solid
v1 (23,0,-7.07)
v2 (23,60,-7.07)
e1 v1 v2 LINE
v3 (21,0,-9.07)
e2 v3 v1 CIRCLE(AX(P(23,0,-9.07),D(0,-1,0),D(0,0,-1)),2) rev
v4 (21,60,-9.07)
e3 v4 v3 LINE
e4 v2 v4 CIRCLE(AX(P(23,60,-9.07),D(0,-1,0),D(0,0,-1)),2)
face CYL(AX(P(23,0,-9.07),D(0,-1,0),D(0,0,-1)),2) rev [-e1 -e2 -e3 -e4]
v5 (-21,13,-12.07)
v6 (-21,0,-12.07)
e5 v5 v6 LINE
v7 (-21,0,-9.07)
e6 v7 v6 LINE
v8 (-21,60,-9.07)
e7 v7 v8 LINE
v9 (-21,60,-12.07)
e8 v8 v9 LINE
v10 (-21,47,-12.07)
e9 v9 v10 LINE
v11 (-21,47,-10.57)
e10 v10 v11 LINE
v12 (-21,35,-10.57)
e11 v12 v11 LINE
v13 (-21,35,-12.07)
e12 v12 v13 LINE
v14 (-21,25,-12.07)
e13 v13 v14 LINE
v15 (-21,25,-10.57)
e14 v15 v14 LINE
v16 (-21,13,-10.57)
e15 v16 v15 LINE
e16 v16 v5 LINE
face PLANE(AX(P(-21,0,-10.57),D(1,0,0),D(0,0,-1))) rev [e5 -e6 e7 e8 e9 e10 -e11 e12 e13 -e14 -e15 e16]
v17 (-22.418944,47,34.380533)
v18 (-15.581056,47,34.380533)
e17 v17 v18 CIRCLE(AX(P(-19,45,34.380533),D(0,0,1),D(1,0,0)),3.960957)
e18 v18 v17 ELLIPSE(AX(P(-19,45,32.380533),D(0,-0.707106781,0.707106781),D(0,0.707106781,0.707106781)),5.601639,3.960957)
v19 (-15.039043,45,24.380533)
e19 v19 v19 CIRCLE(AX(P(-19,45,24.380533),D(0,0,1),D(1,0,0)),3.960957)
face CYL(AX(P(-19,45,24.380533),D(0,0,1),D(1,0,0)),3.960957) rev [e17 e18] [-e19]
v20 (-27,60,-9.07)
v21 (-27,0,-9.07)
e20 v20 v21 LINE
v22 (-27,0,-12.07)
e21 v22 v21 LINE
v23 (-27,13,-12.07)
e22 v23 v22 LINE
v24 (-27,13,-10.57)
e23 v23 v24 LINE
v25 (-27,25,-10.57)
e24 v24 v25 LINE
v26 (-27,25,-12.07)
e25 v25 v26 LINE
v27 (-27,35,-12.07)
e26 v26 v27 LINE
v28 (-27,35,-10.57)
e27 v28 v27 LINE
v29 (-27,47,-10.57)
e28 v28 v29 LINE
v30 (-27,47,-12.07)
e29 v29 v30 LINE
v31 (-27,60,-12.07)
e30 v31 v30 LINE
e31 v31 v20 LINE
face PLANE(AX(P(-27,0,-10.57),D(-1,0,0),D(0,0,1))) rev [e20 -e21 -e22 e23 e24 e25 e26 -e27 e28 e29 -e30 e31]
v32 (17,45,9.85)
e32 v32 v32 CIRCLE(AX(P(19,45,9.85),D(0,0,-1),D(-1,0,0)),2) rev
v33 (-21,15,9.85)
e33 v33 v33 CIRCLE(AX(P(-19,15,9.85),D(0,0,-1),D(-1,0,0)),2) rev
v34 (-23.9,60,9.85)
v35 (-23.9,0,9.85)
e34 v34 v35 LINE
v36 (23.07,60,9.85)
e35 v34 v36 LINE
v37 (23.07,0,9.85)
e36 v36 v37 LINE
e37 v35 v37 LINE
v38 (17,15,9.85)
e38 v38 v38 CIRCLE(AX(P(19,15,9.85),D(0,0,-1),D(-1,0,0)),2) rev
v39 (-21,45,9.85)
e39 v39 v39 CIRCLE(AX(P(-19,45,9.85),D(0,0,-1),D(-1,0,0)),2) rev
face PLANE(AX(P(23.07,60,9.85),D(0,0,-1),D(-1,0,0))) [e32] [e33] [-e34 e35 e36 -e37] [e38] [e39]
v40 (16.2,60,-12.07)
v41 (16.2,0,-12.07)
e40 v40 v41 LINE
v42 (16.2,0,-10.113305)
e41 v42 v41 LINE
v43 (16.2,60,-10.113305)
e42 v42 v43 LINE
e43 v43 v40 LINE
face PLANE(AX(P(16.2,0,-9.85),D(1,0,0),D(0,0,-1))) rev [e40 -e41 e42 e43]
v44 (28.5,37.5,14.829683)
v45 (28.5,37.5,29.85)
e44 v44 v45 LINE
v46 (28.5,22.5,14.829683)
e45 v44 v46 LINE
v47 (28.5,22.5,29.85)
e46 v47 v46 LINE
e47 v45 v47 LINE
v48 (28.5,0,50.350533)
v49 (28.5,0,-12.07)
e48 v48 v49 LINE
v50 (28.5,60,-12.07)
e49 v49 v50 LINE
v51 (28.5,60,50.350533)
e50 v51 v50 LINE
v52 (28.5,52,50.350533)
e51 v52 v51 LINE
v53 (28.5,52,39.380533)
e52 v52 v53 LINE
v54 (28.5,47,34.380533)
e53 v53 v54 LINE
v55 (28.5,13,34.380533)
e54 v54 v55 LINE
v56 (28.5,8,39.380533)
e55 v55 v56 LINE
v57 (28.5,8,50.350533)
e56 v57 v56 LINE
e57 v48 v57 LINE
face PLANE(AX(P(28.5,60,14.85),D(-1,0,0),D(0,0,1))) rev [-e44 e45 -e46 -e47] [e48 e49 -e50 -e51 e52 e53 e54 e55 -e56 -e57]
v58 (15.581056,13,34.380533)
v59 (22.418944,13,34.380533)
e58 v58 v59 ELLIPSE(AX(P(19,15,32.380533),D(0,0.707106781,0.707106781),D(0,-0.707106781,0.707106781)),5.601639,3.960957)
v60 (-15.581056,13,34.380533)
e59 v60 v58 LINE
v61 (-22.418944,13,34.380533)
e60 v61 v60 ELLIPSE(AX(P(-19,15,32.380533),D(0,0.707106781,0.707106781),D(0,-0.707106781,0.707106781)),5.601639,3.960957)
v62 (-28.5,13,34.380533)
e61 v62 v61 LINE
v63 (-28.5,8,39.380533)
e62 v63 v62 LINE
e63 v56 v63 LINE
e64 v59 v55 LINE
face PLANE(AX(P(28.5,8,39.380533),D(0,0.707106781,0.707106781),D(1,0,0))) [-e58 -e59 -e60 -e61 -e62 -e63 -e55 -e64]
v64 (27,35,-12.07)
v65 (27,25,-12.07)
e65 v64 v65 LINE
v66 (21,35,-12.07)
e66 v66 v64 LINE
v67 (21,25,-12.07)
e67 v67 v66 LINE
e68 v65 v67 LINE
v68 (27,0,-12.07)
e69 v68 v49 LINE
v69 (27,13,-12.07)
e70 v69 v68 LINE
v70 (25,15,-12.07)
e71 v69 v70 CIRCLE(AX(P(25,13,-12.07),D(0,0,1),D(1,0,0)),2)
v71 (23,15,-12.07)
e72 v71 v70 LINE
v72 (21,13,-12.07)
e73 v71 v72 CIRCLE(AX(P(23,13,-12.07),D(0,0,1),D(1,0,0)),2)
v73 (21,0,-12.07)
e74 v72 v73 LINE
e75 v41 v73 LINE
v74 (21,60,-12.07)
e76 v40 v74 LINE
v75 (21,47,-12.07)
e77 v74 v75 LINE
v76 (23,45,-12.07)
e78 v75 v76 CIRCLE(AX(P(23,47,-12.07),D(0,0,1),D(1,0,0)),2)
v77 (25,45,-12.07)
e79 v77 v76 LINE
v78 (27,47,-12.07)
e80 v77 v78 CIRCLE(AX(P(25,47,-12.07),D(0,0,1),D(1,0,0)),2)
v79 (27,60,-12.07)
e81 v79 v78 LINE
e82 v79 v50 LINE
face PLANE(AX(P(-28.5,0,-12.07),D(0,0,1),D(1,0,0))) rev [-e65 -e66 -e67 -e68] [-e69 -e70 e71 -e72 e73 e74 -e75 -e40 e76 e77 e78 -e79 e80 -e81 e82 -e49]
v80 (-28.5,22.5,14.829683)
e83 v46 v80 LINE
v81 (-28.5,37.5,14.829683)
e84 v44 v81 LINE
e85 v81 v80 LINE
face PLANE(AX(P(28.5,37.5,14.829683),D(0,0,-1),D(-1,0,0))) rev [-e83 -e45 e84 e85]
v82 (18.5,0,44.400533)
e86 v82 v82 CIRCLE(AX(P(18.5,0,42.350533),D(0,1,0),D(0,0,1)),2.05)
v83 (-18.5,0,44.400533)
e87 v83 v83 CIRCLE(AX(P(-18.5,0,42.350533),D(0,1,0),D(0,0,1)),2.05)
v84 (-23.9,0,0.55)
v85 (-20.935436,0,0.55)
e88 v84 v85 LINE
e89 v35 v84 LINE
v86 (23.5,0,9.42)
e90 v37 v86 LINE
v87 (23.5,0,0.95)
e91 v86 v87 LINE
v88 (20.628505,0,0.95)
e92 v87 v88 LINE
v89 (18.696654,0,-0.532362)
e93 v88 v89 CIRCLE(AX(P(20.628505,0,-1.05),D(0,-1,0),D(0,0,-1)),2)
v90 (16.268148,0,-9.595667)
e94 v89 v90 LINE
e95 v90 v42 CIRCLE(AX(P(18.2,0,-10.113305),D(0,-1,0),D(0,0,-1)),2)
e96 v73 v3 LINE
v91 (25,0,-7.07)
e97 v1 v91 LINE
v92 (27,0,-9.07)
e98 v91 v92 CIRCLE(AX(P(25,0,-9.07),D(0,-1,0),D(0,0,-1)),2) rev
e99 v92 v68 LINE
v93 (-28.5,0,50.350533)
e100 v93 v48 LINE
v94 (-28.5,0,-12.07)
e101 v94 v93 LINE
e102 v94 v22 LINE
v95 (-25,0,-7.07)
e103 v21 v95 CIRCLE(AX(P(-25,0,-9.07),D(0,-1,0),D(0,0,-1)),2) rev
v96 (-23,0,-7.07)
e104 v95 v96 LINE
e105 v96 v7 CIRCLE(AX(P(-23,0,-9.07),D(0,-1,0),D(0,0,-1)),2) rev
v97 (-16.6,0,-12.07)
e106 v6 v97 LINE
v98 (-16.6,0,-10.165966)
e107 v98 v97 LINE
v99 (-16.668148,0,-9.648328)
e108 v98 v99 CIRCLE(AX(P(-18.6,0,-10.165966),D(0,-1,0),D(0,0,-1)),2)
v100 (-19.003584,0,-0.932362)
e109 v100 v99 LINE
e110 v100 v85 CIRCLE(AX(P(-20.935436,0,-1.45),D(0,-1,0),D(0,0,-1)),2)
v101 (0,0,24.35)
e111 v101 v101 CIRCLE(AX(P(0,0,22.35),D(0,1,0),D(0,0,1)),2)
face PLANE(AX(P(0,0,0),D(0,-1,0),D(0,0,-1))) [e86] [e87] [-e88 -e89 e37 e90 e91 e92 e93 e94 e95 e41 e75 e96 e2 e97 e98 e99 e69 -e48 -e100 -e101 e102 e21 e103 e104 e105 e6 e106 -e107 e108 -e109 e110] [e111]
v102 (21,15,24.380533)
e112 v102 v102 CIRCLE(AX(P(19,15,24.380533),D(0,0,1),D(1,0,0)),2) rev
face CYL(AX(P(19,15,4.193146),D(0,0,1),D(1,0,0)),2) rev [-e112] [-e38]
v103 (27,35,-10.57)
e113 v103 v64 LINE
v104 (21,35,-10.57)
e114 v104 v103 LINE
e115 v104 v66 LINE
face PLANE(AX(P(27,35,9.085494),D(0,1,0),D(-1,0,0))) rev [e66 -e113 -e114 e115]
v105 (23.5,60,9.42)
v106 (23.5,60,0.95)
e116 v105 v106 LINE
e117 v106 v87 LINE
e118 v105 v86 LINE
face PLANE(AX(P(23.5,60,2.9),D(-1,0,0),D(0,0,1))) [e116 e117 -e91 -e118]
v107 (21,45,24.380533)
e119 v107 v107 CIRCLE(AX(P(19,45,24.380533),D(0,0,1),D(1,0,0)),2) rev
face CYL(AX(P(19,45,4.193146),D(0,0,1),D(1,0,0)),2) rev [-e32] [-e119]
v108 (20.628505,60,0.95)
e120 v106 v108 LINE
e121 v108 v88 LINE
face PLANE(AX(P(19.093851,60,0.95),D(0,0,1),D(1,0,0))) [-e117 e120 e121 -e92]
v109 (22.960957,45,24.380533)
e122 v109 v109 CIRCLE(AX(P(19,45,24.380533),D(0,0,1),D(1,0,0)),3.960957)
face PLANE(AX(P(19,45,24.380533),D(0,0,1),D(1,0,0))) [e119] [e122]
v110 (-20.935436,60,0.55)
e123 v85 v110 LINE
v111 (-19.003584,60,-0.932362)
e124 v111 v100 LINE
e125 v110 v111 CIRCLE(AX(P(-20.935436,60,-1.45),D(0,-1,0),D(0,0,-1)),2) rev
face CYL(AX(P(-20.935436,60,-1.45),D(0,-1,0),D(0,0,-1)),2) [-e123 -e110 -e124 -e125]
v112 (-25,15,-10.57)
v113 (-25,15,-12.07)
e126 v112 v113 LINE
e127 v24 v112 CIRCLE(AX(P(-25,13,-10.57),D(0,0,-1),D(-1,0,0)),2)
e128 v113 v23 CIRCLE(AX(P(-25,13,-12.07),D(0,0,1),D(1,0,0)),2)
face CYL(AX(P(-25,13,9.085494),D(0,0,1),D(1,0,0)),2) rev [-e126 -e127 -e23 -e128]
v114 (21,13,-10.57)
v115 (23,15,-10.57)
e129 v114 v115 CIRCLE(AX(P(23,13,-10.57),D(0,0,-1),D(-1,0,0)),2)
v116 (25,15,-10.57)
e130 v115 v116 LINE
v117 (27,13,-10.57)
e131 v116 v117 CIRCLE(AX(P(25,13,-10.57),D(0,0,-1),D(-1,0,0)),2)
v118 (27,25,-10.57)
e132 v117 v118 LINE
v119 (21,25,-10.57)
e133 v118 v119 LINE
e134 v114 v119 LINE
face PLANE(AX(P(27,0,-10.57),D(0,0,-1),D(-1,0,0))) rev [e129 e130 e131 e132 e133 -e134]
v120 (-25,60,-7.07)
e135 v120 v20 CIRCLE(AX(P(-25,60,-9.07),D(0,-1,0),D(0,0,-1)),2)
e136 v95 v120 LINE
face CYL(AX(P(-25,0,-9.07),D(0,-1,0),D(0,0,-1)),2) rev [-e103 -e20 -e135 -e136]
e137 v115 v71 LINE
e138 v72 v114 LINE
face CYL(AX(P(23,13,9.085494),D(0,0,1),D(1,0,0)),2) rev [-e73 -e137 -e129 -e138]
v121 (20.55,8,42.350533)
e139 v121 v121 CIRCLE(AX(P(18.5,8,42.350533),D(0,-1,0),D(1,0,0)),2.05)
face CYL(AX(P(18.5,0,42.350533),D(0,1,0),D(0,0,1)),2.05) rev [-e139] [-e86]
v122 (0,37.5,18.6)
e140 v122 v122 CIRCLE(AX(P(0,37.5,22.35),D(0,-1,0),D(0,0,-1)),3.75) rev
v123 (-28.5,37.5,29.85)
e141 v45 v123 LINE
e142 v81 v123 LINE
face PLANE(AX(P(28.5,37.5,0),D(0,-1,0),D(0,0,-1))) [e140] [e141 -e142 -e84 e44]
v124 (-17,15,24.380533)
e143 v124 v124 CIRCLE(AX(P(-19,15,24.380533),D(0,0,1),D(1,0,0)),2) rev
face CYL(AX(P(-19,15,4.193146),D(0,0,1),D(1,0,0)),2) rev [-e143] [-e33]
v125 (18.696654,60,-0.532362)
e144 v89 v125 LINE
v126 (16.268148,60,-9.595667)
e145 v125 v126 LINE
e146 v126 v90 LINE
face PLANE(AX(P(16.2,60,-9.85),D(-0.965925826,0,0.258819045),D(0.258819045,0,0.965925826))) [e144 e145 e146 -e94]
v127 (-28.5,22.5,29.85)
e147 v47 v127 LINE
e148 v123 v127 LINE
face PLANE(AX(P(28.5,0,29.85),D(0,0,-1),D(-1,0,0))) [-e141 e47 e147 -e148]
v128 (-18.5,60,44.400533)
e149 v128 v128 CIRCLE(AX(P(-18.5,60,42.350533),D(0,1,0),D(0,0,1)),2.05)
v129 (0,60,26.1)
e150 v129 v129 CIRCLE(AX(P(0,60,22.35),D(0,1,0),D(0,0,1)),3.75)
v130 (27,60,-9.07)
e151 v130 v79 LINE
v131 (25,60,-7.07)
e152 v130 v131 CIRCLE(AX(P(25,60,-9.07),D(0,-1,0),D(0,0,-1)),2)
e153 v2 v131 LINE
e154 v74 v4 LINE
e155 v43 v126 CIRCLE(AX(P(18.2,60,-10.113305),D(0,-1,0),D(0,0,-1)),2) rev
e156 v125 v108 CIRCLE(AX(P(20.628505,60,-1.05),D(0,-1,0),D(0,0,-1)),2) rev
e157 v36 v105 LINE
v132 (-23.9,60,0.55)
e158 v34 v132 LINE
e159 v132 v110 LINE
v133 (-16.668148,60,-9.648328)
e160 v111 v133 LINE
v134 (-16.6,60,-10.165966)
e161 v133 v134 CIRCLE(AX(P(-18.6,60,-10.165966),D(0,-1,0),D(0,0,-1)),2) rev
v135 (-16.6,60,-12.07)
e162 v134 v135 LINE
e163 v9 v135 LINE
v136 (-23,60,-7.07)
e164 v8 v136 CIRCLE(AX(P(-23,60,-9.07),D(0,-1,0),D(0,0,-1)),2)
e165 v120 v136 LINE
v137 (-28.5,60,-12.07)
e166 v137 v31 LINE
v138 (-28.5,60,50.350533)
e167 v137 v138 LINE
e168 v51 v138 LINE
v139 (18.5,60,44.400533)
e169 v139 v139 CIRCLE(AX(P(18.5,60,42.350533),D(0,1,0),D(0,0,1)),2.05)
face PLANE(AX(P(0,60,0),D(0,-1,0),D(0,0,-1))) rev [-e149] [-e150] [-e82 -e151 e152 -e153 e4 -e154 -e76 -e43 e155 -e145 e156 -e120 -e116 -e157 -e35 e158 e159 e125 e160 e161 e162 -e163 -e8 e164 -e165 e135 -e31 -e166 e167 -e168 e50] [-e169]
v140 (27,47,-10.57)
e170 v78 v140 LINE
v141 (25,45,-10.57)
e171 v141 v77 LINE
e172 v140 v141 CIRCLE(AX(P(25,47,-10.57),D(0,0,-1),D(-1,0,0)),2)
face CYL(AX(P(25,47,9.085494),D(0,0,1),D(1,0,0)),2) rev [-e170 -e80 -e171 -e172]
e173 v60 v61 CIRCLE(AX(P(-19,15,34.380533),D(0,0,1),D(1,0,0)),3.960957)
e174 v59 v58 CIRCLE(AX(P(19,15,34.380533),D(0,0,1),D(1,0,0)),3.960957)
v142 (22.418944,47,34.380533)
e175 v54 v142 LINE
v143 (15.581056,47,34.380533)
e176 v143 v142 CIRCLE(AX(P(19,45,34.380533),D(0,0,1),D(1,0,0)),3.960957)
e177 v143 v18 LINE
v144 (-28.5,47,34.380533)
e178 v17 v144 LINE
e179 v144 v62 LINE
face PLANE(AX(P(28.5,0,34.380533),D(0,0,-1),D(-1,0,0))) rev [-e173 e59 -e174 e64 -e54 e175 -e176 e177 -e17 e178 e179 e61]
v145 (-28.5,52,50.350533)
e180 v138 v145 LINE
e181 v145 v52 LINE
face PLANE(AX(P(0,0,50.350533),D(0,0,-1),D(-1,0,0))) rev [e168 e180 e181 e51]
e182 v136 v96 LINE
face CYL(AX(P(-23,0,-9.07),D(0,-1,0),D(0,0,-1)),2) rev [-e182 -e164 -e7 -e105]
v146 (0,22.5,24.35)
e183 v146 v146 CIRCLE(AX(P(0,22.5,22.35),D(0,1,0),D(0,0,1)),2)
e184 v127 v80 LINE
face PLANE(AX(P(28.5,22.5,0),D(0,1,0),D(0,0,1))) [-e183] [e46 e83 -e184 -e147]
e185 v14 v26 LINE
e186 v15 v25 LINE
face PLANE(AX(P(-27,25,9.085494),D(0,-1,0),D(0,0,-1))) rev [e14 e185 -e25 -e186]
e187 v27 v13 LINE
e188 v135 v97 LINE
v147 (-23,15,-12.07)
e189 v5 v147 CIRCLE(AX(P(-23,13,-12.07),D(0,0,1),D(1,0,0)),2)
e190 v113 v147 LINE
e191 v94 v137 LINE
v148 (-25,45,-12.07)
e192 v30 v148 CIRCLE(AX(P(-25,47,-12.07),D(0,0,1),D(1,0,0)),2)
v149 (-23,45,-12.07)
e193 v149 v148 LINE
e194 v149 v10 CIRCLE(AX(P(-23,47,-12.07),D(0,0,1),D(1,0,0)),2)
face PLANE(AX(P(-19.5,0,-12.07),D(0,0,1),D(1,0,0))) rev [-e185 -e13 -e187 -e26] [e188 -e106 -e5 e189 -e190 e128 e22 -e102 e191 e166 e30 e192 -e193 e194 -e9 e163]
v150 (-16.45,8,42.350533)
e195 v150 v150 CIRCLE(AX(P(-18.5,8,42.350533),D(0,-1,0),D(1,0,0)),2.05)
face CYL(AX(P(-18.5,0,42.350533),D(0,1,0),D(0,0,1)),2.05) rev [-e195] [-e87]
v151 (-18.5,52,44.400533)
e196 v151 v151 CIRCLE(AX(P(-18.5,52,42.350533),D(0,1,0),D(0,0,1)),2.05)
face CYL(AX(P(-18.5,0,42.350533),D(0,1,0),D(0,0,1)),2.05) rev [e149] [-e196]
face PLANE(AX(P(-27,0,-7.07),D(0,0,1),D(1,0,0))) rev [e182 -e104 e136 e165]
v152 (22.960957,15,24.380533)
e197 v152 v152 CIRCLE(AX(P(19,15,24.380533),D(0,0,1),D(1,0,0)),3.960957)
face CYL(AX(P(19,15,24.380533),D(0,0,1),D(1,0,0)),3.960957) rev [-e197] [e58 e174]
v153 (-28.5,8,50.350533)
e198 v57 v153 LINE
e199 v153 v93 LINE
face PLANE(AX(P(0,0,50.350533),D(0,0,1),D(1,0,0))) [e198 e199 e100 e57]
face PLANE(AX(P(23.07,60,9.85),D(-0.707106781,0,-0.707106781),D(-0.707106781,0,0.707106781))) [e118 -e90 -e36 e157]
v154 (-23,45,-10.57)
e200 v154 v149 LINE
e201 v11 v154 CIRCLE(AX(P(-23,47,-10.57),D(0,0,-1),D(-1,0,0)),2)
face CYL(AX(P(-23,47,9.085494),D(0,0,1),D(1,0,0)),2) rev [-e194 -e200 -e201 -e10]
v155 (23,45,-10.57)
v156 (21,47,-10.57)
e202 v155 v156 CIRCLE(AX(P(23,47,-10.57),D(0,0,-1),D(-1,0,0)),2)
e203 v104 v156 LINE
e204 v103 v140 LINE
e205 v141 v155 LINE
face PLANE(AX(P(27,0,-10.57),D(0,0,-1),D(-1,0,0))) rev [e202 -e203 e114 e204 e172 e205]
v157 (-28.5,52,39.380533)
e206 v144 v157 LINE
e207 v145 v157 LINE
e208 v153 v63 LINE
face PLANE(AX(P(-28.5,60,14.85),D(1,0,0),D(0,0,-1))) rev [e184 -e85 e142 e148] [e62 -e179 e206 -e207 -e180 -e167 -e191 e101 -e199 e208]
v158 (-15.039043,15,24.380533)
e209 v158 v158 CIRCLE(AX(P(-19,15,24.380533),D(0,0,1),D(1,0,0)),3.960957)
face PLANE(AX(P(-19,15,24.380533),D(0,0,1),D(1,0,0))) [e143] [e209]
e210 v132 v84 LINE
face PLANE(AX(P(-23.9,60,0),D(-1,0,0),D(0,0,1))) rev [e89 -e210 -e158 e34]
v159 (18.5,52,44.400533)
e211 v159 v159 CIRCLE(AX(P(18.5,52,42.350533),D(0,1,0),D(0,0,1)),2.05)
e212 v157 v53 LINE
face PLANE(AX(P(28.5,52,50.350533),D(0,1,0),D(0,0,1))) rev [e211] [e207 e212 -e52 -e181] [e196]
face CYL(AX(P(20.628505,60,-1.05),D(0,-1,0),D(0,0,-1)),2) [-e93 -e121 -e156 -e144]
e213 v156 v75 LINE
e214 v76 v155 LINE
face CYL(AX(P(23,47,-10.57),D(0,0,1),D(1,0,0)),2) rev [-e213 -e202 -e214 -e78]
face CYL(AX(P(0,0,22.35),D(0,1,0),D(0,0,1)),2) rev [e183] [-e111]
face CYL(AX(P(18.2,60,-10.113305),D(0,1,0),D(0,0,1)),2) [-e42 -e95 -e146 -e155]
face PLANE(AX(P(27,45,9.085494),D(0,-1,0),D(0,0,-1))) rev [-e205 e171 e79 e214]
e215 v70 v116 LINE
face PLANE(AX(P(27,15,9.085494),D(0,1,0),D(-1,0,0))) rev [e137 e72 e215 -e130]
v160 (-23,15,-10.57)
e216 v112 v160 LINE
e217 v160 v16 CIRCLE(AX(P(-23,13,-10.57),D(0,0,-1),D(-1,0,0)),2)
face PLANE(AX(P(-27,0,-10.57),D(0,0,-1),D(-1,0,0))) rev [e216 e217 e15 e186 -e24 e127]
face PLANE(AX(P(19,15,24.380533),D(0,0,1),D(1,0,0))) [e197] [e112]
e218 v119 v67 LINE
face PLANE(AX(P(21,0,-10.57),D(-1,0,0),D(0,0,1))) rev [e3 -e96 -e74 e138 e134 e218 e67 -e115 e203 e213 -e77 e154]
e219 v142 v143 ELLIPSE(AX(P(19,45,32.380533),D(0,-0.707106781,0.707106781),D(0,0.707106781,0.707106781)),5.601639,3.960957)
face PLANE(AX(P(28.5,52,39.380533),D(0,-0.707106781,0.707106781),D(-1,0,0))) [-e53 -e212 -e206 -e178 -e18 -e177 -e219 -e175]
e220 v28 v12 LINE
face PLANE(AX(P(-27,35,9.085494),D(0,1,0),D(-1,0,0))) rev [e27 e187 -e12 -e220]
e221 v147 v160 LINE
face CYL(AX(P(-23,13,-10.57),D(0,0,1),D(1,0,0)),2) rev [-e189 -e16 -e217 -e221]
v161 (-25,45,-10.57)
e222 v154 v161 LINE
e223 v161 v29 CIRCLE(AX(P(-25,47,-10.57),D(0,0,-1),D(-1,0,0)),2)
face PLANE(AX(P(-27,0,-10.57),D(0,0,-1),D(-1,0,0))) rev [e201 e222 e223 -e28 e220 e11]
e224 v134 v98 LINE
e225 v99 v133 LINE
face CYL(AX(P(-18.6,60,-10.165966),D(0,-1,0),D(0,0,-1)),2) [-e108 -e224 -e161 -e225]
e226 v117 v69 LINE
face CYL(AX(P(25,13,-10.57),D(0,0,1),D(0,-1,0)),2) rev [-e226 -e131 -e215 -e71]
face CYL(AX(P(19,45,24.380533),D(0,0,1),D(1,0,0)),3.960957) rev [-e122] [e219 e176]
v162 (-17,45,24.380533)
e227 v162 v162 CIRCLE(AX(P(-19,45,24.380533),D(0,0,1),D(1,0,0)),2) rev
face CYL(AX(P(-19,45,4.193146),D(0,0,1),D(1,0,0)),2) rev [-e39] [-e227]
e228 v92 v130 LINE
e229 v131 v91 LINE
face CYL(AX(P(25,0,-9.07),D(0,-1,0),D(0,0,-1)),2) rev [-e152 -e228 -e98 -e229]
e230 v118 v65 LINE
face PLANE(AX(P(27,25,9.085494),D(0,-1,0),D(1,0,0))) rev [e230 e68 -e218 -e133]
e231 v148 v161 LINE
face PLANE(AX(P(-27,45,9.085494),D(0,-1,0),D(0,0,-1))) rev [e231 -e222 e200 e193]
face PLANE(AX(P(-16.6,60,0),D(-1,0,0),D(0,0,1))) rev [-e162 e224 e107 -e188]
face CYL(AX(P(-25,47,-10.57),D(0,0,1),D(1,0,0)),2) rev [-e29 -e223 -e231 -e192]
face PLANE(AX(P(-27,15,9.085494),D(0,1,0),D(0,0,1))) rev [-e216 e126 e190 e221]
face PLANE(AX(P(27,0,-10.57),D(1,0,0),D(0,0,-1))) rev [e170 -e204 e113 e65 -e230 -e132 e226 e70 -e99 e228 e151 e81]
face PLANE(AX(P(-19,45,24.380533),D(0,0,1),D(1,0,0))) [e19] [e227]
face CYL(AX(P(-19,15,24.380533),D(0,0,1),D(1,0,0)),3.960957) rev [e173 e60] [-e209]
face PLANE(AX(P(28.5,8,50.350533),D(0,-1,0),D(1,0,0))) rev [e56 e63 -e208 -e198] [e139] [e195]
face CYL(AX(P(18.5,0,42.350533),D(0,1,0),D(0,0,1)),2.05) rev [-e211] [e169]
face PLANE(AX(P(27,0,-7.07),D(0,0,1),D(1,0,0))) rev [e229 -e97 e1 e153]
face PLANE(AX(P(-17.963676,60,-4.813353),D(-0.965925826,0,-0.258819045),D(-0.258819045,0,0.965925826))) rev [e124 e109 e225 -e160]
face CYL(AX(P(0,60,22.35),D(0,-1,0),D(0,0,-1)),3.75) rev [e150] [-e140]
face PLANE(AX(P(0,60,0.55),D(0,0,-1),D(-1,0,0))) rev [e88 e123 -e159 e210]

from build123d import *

# Parameters (mm, degrees)
SKETCH1_W            = 57
SKETCH1_H            = 28.7
BOSS_EXTRUDE1_DEPTH  = 60
SKETCH2_W            = 9
SKETCH2_H            = 4
CUT_EXTRUDE1_DEPTH   = 69.064473112
BOSS_EXTRUDE2_DEPTH  = 28.5
SKETCH6_W            = 15.5
SKETCH6_H            = 15.390476131
CUT_EXTRUDE2_DEPTH   = 80
BOSS_EXTRUDE5_DEPTH  = 60
SKETCH10_R           = 2
CUT_EXTRUDE3_DEPTH   = 24.530533394
SKETCH11_W           = 61.984050455
SKETCH11_H           = 43.227353824
SKETCH11_W_2         = 6
SKETCH11_H_2         = 2.542732203
CUT_EXTRUDE4_DEPTH   = 77.839254789
SKETCH13_W           = 6.011053281
SKETCH13_H           = 2.620549071
CUT_EXTRUDE5_DEPTH   = 77.839254789
SKETCH14_W           = 9
SKETCH14_H           = 4
BOSS_EXTRUDE7_DEPTH  = 60
SKETCH12_W           = 10.230058637
SKETCH12_H           = 6.686923691
BOSS_EXTRUDE6_DEPTH  = 60
SKETCH15_W           = 9
SKETCH15_H           = 4
BOSS_EXTRUDE8_DEPTH  = 60
SKETCH16_W           = 9
SKETCH16_H           = 1.78
CUT_EXTRUDE6_DEPTH   = 77.839254789
SKETCH17_W           = 25.75
SKETCH17_H           = 20.1006285
CUT_EXTRUDE7_DEPTH   = 77.839254789
SKETCH18_W           = 32.4
SKETCH18_H           = 12.613288226
CUT_EXTRUDE8_DEPTH   = 75.79485996
SKETCH19_W           = 57
SKETCH19_H           = 3.949842852
CUT_EXTRUDE9_DEPTH   = 75.79485996
SKETCH20_W           = 6
SKETCH20_H           = 3.5
CUT_EXTRUDE10_DEPTH  = 75.79485996
SKETCH21_W           = 6
SKETCH21_H           = 3.5
CUT_EXTRUDE11_DEPTH  = 1.5
SKETCH23_R           = 3.75
CUT_EXTRUDE12_DEPTH  = 59.313986952
SKETCH24_R           = 2
CUT_EXTRUDE13_DEPTH  = 59.313986952
SKETCH25_R           = 3.960956754
CUT_EXTRUDE14_DEPTH  = 10
SKETCH26_W           = 6
SKETCH26_H           = 10
SKETCH26_H_2         = 15
CUT_EXTRUDE15_DEPTH  = 5
CUT_EXTRUDE17_DEPTH  = 75.79485996
SKETCH28_W           = 15.020317418
SKETCH28_H           = 14.99999997
CUT_EXTRUDE18_DEPTH  = 90.615964406
SKETCH32_W           = 57
SKETCH32_H           = 8
BOSS_EXTRUDE10_DEPTH = 15.97
SKETCH33_R           = 2.05
CUT_EXTRUDE20_DEPTH  = 84.351222025
FILLET1_R            = 2
FILLET2_R            = 2
CHAMFER1_SIZE        = 5


with BuildPart() as part:
    # Sketch1 → Boss-Extrude1 (new body)
    with BuildSketch(Plane(origin=(0, 0, 0), x_dir=(1, 0, 0), z_dir=(0, 1, 0))):
        with Locations((0, -0.5)):
            Rectangle(SKETCH1_W, SKETCH1_H)
        Polygon((23.07, -9.85), (-23.07, -9.85), (-23.5, -9.42), (-23.5, -0.95), (-19.09385128, -0.95), (-19, -0.599742255), (-16.2, 9.85), (16.2, 9.85), (19, -0.599742255), (19.09385128, -0.95), (23.5, -0.95), (23.5, -2.9), (23.5, -9.42), align=None, mode=Mode.SUBTRACT)
    extrude(amount=BOSS_EXTRUDE1_DEPTH)

    # Sketch2 → Cut-Extrude1 (cut, through all)
    with BuildSketch(Plane.XZ):
        with Locations((24, -10.0706285)):
            Rectangle(SKETCH2_W, SKETCH2_H)
        with Locations((-24, -10.0706285)):
            Rectangle(SKETCH2_W, SKETCH2_H)
    extrude(amount=-CUT_EXTRUDE1_DEPTH, mode=Mode.SUBTRACT)

    # Sketch5 → Boss-Extrude2 (add, symmetric)
    with BuildSketch(Plane(origin=(0, 0, 0), x_dir=(0, 0, -1), z_dir=(1, 0, 0))):
        with BuildLine():
            Line((-14.85, 0), (-14.85, 23.200000017))
            Line((-14.85, 23.200000017), (-15.549999973, 22.50000003))
            Line((-15.549999973, 22.50000003), (-29.149999973, 22.50000003))
            Line((-29.149999973, 22.50000003), (-29.849999973, 23.20000003))
            Line((-29.849999973, 23.20000003), (-29.849999973, 25.743360053))
            ThreePointArc((-29.849999973, 25.743360053), (-29.773879502, 26.126043492), (-29.557106746, 26.450466847))
            Line((-29.557106746, 26.450466847), (-27.237157266, 28.770416328))
            ThreePointArc((-27.237157266, 28.770416328), (-27.150448162, 28.900185674), (-27.119999973, 29.053259055))
            Line((-27.119999973, 29.053259055), (-27.119999973, 30.615319642))
            ThreePointArc((-27.119999973, 30.615319642), (-27.150448164, 30.768393021), (-27.237157268, 30.898162365))
            Line((-27.237157268, 30.898162365), (-27.431588163, 31.09259326))
            ThreePointArc((-27.431588163, 31.09259326), (-27.613507965, 31.297692563), (-27.620638933, 31.57175403))
            ThreePointArc((-27.620638933, 31.57175403), (-28.017573243, 32.42857618), (-28.828543655, 32.91234062))
            ThreePointArc((-28.828543655, 32.91234062), (-29.01918836, 33.020436377), (-29.124259054, 33.212764861))
            Line((-29.124259054, 33.212764861), (-29.156235284, 33.354092333))
            ThreePointArc((-29.156235284, 33.354092333), (-29.24659278, 33.53064407), (-29.410649592, 33.642090719))
            Line((-29.410649592, 33.642090719), (-29.585724304, 33.70524196))
            ThreePointArc((-29.585724304, 33.70524196), (-29.777329878, 33.851609246), (-29.849999973, 34.081511694))
            Line((-29.849999973, 34.081511694), (-29.849999973, 34.837490602))
            ThreePointArc((-29.849999973, 34.837490602), (-29.772088513, 35.074680338), (-29.568705112, 35.219471078))
            Line((-29.568705112, 35.219471078), (-29.427668799, 35.263299846))
            ThreePointArc((-29.427668799, 35.263299846), (-29.25116358, 35.375371369), (-29.155313737, 35.561185593))
            Line((-29.155313737, 35.561185593), (-29.125010632, 35.702102112))
            ThreePointArc((-29.125010632, 35.702102112), (-29.020526118, 35.897067182), (-28.828406063, 36.006695082))
            ThreePointArc((-28.828406063, 36.006695082), (-28.025619489, 36.481556021), (-27.62403672, 37.32339358))
            ThreePointArc((-27.62403672, 37.32339358), (-27.540484938, 37.407225271), (-27.43605838, 37.46293655))
            Line((-27.43605838, 37.46293655), (-27.39899493, 37.5))
            Line((-27.39899493, 37.5), (-17.30100503, 37.5))
            Line((-17.30100503, 37.5), (-17.26394158, 37.46293655))
            ThreePointArc((-17.26394158, 37.46293655), (-17.159515017, 37.407225278), (-17.07596324, 37.32339358))
            ThreePointArc((-17.07596324, 37.32339358), (-16.674380468, 36.481556018), (-15.871593887, 36.006695079))
            ThreePointArc((-15.871593887, 36.006695079), (-15.679473839, 35.897067189), (-15.574989331, 35.702102127))
            Line((-15.574989331, 35.702102127), (-15.544686222, 35.561185587))
            ThreePointArc((-15.544686222, 35.561185587), (-15.448836377, 35.375371364), (-15.272331158, 35.263299843))
            Line((-15.272331158, 35.263299843), (-15.131294869, 35.219471083))
            ThreePointArc((-15.131294869, 35.219471083), (-14.927911462, 35.074680333), (-14.85, 34.837490586))
            Line((-14.85, 34.837490586), (-14.85, 60))
            Line((-14.85, 60), (-34.380533394, 60))
            Line((-34.380533394, 60), (-34.380533394, 0))
            Line((-34.380533394, 0), (-14.85, 0))
        make_face()
        with BuildLine():
            ThreePointArc((-15.142893227, 26.450466847), (-14.926120471, 26.126043492), (-14.85, 25.743360053))
            Line((-14.85, 25.743360053), (-14.85, 34.081511674))
            ThreePointArc((-14.85, 34.081511674), (-14.922670087, 33.851609245), (-15.114275644, 33.70524197))
            Line((-15.114275644, 33.70524197), (-15.289350386, 33.642090718))
            ThreePointArc((-15.289350386, 33.642090718), (-15.453407192, 33.53064407), (-15.543764688, 33.354092339))
            Line((-15.543764688, 33.354092339), (-15.57574092, 33.21276486))
            ThreePointArc((-15.57574092, 33.21276486), (-15.680811613, 33.020436377), (-15.871456319, 32.91234062))
            ThreePointArc((-15.871456319, 32.91234062), (-16.68242673, 32.42857618), (-17.07936104, 31.57175403))
            ThreePointArc((-17.07936104, 31.57175403), (-17.086492012, 31.297692565), (-17.26841181, 31.09259326))
            Line((-17.26841181, 31.09259326), (-17.462842708, 30.898162362))
            ThreePointArc((-17.462842708, 30.898162362), (-17.549551812, 30.768393016), (-17.58, 30.615319635))
            Line((-17.58, 30.615319635), (-17.58, 29.053259048))
            ThreePointArc((-17.58, 29.053259048), (-17.54955181, 28.900185669), (-17.462842705, 28.770416325))
            Line((-17.462842705, 28.770416325), (-15.142893227, 26.450466847))
        make_face()
    extrude(amount=BOSS_EXTRUDE2_DEPTH, both=True)

    # Sketch6 → Cut-Extrude2 (cut)
    with BuildSketch(Plane(origin=(0, 60, 0), x_dir=(1, 0, 0), z_dir=(0, 1, 0))):
        with Locations((0, 12.050145064)):
            Rectangle(SKETCH6_W, SKETCH6_H)
    extrude(amount=-CUT_EXTRUDE2_DEPTH, mode=Mode.SUBTRACT)

    # Sketch9 → Boss-Extrude5 (add)
    with BuildSketch(Plane(origin=(0, 60, 0), x_dir=(1, 0, 0), z_dir=(0, 1, 0))):
        Polygon((-19.5, 13.85), (-19.5, 29.1706285), (-28.5, 29.1706285), (-28.5, 26.1706285), (-33.5, 26.1706285), (-33.5, 32.1706285), (-14.5, 32.1706285), (-14.5, 13.85), align=None)
        Polygon((30.2, 12.85), (30.2, 28.735786438), (19.5, 28.735786438), (19.5, 13.85), (14.5, 13.85), (14.5, 32.1706285), (33.5, 32.1706285), (33.5, 12.85), align=None)
    extrude(amount=-BOSS_EXTRUDE5_DEPTH)

    # Sketch10 → Cut-Extrude3 (cut)
    with BuildSketch(Plane.XY.offset(34.380533394)):
        with Locations((19, 45)):
            Circle(SKETCH10_R)
        with Locations((19, 15)):
            Circle(SKETCH10_R)
        with Locations((-19, 15)):
            Circle(SKETCH10_R)
        with Locations((-19, 45)):
            Circle(SKETCH10_R)
    extrude(amount=-CUT_EXTRUDE3_DEPTH, mode=Mode.SUBTRACT)

    # Sketch11 → Cut-Extrude4 (cut, through all)
    with BuildSketch(Plane.XZ):
        with Locations((44.734239641, -35.463676912)):
            Rectangle(SKETCH11_W, SKETCH11_H)
        with Locations((32.2, -12.566438328)):
            Rectangle(SKETCH11_W_2, SKETCH11_H_2)
    extrude(amount=-CUT_EXTRUDE4_DEPTH, mode=Mode.SUBTRACT)


with BuildPart() as cut_extrude4_piece_1:
    # of the separate pieces the step leaves, piece 1, a body of its own (cut_extrude4_pieces)
    add(part.part.solids().sort_by_distance((-28.5, 23.200000017, 14.85))[0])

    # Sketch14 → Boss-Extrude7 (add, through all)
    with BuildSketch(Plane(origin=(0, 0, 0), x_dir=(-1, 0, 0), z_dir=(0, -1, 0))):
        with Locations((-24, 10.0706285)):
            Rectangle(SKETCH14_W, SKETCH14_H)
    extrude(amount=-BOSS_EXTRUDE7_DEPTH)

    # Sketch12 → Boss-Extrude6 (add, through all)
    with BuildSketch(Plane.XZ):
        with Locations((23.384970682, -10.506538155)):
            Rectangle(SKETCH12_W, SKETCH12_H)
    extrude(amount=-BOSS_EXTRUDE6_DEPTH)

    # Sketch15 → Boss-Extrude8 (add, through all)
    with BuildSketch(Plane(origin=(0, 60, 0), x_dir=(1, 0, 0), z_dir=(0, 1, 0))):
        with Locations((-24, 10.0706285)):
            Rectangle(SKETCH15_W, SKETCH15_H)
    extrude(amount=-BOSS_EXTRUDE8_DEPTH)

    # Sketch16 → Cut-Extrude6 (cut, through all)
    with BuildSketch(Plane(origin=(0, 60, 0), x_dir=(1, 0, 0), z_dir=(0, 1, 0))):
        with Locations((-24, 12.96)):
            Rectangle(SKETCH16_W, SKETCH16_H)
    extrude(amount=-CUT_EXTRUDE6_DEPTH, mode=Mode.SUBTRACT)

    # Sketch17 → Cut-Extrude7 (cut, through all)
    with BuildSketch(Plane(origin=(0, 60, 0), x_dir=(1, 0, 0), z_dir=(0, 1, 0))):
        with Locations((-20.625, 22.12031425)):
            Rectangle(SKETCH17_W, SKETCH17_H)
    extrude(amount=-CUT_EXTRUDE7_DEPTH, mode=Mode.SUBTRACT)

    # Sketch18 → Cut-Extrude8 (cut, through all)
    with BuildSketch(Plane(origin=(0, 60, 0), x_dir=(1, 0, 0), z_dir=(0, 1, 0))):
        with Locations((0, 16.156644113)):
            Rectangle(SKETCH18_W, SKETCH18_H)
    extrude(amount=-CUT_EXTRUDE8_DEPTH, mode=Mode.SUBTRACT)

    # Sketch19 → Cut-Extrude9 (cut, through all)
    with BuildSketch(Plane(origin=(0, 60, 0), x_dir=(1, 0, 0), z_dir=(0, 1, 0))):
        with Locations((0, 14.044921426)):
            Rectangle(SKETCH19_W, SKETCH19_H)
    extrude(amount=-CUT_EXTRUDE9_DEPTH, mode=Mode.SUBTRACT)

    # Sketch20 → Cut-Extrude10 (cut, through all)
    with BuildSketch(Plane(origin=(0, 60, 0), x_dir=(1, 0, 0), z_dir=(0, 1, 0))):
        with Locations((-24, 8.82)):
            Rectangle(SKETCH20_W, SKETCH20_H)
        with Locations((24, 8.82)):
            Rectangle(SKETCH20_W, SKETCH20_H)
    extrude(amount=-CUT_EXTRUDE10_DEPTH, mode=Mode.SUBTRACT)

    # Sketch21 → Cut-Extrude11 (cut)
    with BuildSketch(Plane(origin=(0, 0, -12.07), x_dir=(-1, 0, 0), z_dir=(0, 0, -1))):
        with Locations((-24, 48.25)):
            Rectangle(SKETCH21_W, SKETCH21_H)
        with Locations((24, 48.25)):
            Rectangle(SKETCH21_W, SKETCH21_H)
        with Locations((24, 11.75)):
            Rectangle(SKETCH21_W, SKETCH21_H)
        with Locations((-24, 11.75)):
            Rectangle(SKETCH21_W, SKETCH21_H)
    extrude(amount=-CUT_EXTRUDE11_DEPTH, mode=Mode.SUBTRACT)

    # Sketch23 → Cut-Extrude12 (cut, through all)
    with BuildSketch(Plane(origin=(0, 22.50000003, 0), x_dir=(1, 0, 0), z_dir=(0, 1, 0))):
        with Locations(Location((0, -22.349999973, 0), (0, 0, 90))):
            Circle(SKETCH23_R)
    extrude(amount=CUT_EXTRUDE12_DEPTH, mode=Mode.SUBTRACT)

    # Sketch24 → Cut-Extrude13 (cut, through all)
    with BuildSketch(Plane(origin=(0, 22.50000003, 0), x_dir=(1, 0, 0), z_dir=(0, 1, 0))):
        with Locations(Location((0, -22.349999973, 0), (0, 0, 270))):
            Circle(SKETCH24_R)
    extrude(amount=-CUT_EXTRUDE13_DEPTH, mode=Mode.SUBTRACT)

    # Sketch25 → Cut-Extrude14 (cut)
    with BuildSketch(Plane.XY.offset(34.380533394)):
        with Locations((19, 15)):
            Circle(SKETCH25_R)
        with Locations((-19, 15)):
            Circle(SKETCH25_R)
        with Locations((19, 45)):
            Circle(SKETCH25_R)
        with Locations((-19, 45)):
            Circle(SKETCH25_R)
    extrude(amount=-CUT_EXTRUDE14_DEPTH, mode=Mode.SUBTRACT)

    # Sketch26 → Cut-Extrude15 (cut)
    with BuildSketch(Plane(origin=(0, 0, -12.07), x_dir=(-1, 0, 0), z_dir=(0, 0, -1))):
        with Locations((24, 30)):
            Rectangle(SKETCH26_W, SKETCH26_H)
        with Locations((24, 7.5)):
            Rectangle(SKETCH26_W, SKETCH26_H_2)
        with Locations((24, 52.5)):
            Rectangle(SKETCH26_W, SKETCH26_H_2)
        with Locations((-24, 30)):
            Rectangle(SKETCH26_W, SKETCH26_H)
        with Locations((-24, 52.5)):
            Rectangle(SKETCH26_W, SKETCH26_H_2)
        with Locations((-24, 7.5)):
            Rectangle(SKETCH26_W, SKETCH26_H_2)
    extrude(amount=-CUT_EXTRUDE15_DEPTH, mode=Mode.SUBTRACT)

    # Sketch27 → Cut-Extrude17 (cut, through all)
    with BuildSketch(Plane.XZ):
        Polygon((-23.5, 9.42), (-23.07, 9.85), (-23.9, 9.85), (-23.9, 9.585685425), (-23.9, 0.55), (-19.400782075, 0.55), (-16.6, -9.902660999), (-16.6, -12.07), (-16.2, -12.07), (-16.2, -9.85), (-19.09385128, 0.95), (-23.5, 0.95), align=None)
    extrude(amount=-CUT_EXTRUDE17_DEPTH, mode=Mode.SUBTRACT)

    # Sketch28 → Cut-Extrude18 (cut, through all)
    with BuildSketch(Plane.ZY.offset(28.5)):
        with Locations((22.339841264, 30.000000015)):
            Rectangle(SKETCH28_W, SKETCH28_H)
    extrude(amount=-CUT_EXTRUDE18_DEPTH, mode=Mode.SUBTRACT)

    # Sketch32 → Boss-Extrude10 (add)
    with BuildSketch(Plane.XY.offset(34.380533394)):
        with Locations((0, 4)):
            Rectangle(SKETCH32_W, SKETCH32_H)
        with Locations((0, 56)):
            Rectangle(SKETCH32_W, SKETCH32_H)
    extrude(amount=BOSS_EXTRUDE10_DEPTH)

    # Sketch33 → Cut-Extrude20 (cut, through all)
    with BuildSketch(Plane(origin=(0, 60, 0), x_dir=(1, 0, 0), z_dir=(0, 1, 0))):
        with Locations(Location((18.5, -42.350533394, 0), (0, 0, 270))):
            Circle(SKETCH33_R)
        with Locations(Location((-18.5, -42.350533394, 0), (0, 0, 270))):
            Circle(SKETCH33_R)
    extrude(amount=-CUT_EXTRUDE20_DEPTH, mode=Mode.SUBTRACT)

    # Fillet1
    fillet1_edges = [cut_extrude4_piece_1.edges().sort_by_distance(p)[0] for p in [
        (19.09385128, 30, 0.95),
        (16.2, 30, -9.85),
        (-16.6, 30, -9.902660999),
        (-19.400782075, 30, 0.55),
    ]]
    fillet(fillet1_edges, radius=FILLET1_R)

    # Fillet2
    fillet2_edges = [cut_extrude4_piece_1.edges().sort_by_distance(p)[0] for p in [
        (-27, 30, -7.07),
        (-21, 30, -7.07),
        (27, 30, -7.07),
        (21, 30, -7.07),
        (-21, 15, -11.32),
        (-27, 15, -11.32),
        (-27, 45, -11.32),
        (-21, 45, -11.32),
        (21, 45, -11.32),
        (27, 45, -11.32),
        (27, 15, -11.32),
        (21, 15, -11.32),
    ]]
    fillet(fillet2_edges, radius=FILLET2_R)

    # Chamfer1
    # the kernel refuses this chamfer: 5 mm, written as the material it adds along each edge
    with BuildSketch(Plane(origin=(-28.5, 52, 34.380533394), x_dir=(0, 0.027495876610586317, 0.9996219169112968), z_dir=(1, 0, 0))) as chamfer1_piece_1_section:
        Polygon((CHAMFER1_SIZE * 0.999621916911, CHAMFER1_SIZE * 0.0274958766106), (-CHAMFER1_SIZE * 0.0274958766106, CHAMFER1_SIZE * 0.999621916911), (0, 0), align=None)
    chamfer1_piece_1 = extrude(amount=57, mode=Mode.PRIVATE)
    chamfer1_piece_1 = chamfer1_piece_1 - Plane(origin=(-19, 45, 36.059443485), x_dir=(1, 0, 0), z_dir=(0, 0, 1)) * Cylinder(3.960956754, 134, mode=Mode.PRIVATE)
    chamfer1_piece_1 = chamfer1_piece_1 - Plane(origin=(19, 45, 36.059443485), x_dir=(1, 0, 0), z_dir=(0, 0, 1)) * Cylinder(3.960956754, 134, mode=Mode.PRIVATE)
    add(chamfer1_piece_1)
    with BuildSketch(Plane(origin=(-28.5, 8, 34.380533394), x_dir=(0, 0.9996219169112968, -0.027495876610586317), z_dir=(1, 0, 0))) as chamfer1_piece_2_section:
        Polygon((CHAMFER1_SIZE * 0.999621916911, CHAMFER1_SIZE * 0.0274958766106), (-CHAMFER1_SIZE * 0.0274958766106, CHAMFER1_SIZE * 0.999621916911), (0, 0), align=None)
    chamfer1_piece_2 = extrude(amount=57, mode=Mode.PRIVATE)
    chamfer1_piece_2 = chamfer1_piece_2 - Plane(origin=(-19, 15, 36.059443438), x_dir=(1, 0, 0), z_dir=(0, 0, 1)) * Cylinder(3.960956754, 134, mode=Mode.PRIVATE)
    chamfer1_piece_2 = chamfer1_piece_2 - Plane(origin=(19, 15, 36.059443438), x_dir=(1, 0, 0), z_dir=(0, 0, 1)) * Cylinder(3.960956754, 134, mode=Mode.PRIVATE)
    add(chamfer1_piece_2)


with BuildPart() as cut_extrude4_piece_2:
    # of the separate pieces the step leaves, piece 2, a body of its own (cut_extrude4_pieces)
    add(part.part.solids().sort_by_distance((33.5, 0, -13.85))[0])

    # Sketch13 → Cut-Extrude5 (cut, through all)
    with BuildSketch(Plane.XZ):
        with Locations((32.65361778, -14.054923964)):
            Rectangle(SKETCH13_W, SKETCH13_H)
    extrude(amount=-CUT_EXTRUDE5_DEPTH, mode=Mode.SUBTRACT)


solid = cut_extrude4_piece_1.part
